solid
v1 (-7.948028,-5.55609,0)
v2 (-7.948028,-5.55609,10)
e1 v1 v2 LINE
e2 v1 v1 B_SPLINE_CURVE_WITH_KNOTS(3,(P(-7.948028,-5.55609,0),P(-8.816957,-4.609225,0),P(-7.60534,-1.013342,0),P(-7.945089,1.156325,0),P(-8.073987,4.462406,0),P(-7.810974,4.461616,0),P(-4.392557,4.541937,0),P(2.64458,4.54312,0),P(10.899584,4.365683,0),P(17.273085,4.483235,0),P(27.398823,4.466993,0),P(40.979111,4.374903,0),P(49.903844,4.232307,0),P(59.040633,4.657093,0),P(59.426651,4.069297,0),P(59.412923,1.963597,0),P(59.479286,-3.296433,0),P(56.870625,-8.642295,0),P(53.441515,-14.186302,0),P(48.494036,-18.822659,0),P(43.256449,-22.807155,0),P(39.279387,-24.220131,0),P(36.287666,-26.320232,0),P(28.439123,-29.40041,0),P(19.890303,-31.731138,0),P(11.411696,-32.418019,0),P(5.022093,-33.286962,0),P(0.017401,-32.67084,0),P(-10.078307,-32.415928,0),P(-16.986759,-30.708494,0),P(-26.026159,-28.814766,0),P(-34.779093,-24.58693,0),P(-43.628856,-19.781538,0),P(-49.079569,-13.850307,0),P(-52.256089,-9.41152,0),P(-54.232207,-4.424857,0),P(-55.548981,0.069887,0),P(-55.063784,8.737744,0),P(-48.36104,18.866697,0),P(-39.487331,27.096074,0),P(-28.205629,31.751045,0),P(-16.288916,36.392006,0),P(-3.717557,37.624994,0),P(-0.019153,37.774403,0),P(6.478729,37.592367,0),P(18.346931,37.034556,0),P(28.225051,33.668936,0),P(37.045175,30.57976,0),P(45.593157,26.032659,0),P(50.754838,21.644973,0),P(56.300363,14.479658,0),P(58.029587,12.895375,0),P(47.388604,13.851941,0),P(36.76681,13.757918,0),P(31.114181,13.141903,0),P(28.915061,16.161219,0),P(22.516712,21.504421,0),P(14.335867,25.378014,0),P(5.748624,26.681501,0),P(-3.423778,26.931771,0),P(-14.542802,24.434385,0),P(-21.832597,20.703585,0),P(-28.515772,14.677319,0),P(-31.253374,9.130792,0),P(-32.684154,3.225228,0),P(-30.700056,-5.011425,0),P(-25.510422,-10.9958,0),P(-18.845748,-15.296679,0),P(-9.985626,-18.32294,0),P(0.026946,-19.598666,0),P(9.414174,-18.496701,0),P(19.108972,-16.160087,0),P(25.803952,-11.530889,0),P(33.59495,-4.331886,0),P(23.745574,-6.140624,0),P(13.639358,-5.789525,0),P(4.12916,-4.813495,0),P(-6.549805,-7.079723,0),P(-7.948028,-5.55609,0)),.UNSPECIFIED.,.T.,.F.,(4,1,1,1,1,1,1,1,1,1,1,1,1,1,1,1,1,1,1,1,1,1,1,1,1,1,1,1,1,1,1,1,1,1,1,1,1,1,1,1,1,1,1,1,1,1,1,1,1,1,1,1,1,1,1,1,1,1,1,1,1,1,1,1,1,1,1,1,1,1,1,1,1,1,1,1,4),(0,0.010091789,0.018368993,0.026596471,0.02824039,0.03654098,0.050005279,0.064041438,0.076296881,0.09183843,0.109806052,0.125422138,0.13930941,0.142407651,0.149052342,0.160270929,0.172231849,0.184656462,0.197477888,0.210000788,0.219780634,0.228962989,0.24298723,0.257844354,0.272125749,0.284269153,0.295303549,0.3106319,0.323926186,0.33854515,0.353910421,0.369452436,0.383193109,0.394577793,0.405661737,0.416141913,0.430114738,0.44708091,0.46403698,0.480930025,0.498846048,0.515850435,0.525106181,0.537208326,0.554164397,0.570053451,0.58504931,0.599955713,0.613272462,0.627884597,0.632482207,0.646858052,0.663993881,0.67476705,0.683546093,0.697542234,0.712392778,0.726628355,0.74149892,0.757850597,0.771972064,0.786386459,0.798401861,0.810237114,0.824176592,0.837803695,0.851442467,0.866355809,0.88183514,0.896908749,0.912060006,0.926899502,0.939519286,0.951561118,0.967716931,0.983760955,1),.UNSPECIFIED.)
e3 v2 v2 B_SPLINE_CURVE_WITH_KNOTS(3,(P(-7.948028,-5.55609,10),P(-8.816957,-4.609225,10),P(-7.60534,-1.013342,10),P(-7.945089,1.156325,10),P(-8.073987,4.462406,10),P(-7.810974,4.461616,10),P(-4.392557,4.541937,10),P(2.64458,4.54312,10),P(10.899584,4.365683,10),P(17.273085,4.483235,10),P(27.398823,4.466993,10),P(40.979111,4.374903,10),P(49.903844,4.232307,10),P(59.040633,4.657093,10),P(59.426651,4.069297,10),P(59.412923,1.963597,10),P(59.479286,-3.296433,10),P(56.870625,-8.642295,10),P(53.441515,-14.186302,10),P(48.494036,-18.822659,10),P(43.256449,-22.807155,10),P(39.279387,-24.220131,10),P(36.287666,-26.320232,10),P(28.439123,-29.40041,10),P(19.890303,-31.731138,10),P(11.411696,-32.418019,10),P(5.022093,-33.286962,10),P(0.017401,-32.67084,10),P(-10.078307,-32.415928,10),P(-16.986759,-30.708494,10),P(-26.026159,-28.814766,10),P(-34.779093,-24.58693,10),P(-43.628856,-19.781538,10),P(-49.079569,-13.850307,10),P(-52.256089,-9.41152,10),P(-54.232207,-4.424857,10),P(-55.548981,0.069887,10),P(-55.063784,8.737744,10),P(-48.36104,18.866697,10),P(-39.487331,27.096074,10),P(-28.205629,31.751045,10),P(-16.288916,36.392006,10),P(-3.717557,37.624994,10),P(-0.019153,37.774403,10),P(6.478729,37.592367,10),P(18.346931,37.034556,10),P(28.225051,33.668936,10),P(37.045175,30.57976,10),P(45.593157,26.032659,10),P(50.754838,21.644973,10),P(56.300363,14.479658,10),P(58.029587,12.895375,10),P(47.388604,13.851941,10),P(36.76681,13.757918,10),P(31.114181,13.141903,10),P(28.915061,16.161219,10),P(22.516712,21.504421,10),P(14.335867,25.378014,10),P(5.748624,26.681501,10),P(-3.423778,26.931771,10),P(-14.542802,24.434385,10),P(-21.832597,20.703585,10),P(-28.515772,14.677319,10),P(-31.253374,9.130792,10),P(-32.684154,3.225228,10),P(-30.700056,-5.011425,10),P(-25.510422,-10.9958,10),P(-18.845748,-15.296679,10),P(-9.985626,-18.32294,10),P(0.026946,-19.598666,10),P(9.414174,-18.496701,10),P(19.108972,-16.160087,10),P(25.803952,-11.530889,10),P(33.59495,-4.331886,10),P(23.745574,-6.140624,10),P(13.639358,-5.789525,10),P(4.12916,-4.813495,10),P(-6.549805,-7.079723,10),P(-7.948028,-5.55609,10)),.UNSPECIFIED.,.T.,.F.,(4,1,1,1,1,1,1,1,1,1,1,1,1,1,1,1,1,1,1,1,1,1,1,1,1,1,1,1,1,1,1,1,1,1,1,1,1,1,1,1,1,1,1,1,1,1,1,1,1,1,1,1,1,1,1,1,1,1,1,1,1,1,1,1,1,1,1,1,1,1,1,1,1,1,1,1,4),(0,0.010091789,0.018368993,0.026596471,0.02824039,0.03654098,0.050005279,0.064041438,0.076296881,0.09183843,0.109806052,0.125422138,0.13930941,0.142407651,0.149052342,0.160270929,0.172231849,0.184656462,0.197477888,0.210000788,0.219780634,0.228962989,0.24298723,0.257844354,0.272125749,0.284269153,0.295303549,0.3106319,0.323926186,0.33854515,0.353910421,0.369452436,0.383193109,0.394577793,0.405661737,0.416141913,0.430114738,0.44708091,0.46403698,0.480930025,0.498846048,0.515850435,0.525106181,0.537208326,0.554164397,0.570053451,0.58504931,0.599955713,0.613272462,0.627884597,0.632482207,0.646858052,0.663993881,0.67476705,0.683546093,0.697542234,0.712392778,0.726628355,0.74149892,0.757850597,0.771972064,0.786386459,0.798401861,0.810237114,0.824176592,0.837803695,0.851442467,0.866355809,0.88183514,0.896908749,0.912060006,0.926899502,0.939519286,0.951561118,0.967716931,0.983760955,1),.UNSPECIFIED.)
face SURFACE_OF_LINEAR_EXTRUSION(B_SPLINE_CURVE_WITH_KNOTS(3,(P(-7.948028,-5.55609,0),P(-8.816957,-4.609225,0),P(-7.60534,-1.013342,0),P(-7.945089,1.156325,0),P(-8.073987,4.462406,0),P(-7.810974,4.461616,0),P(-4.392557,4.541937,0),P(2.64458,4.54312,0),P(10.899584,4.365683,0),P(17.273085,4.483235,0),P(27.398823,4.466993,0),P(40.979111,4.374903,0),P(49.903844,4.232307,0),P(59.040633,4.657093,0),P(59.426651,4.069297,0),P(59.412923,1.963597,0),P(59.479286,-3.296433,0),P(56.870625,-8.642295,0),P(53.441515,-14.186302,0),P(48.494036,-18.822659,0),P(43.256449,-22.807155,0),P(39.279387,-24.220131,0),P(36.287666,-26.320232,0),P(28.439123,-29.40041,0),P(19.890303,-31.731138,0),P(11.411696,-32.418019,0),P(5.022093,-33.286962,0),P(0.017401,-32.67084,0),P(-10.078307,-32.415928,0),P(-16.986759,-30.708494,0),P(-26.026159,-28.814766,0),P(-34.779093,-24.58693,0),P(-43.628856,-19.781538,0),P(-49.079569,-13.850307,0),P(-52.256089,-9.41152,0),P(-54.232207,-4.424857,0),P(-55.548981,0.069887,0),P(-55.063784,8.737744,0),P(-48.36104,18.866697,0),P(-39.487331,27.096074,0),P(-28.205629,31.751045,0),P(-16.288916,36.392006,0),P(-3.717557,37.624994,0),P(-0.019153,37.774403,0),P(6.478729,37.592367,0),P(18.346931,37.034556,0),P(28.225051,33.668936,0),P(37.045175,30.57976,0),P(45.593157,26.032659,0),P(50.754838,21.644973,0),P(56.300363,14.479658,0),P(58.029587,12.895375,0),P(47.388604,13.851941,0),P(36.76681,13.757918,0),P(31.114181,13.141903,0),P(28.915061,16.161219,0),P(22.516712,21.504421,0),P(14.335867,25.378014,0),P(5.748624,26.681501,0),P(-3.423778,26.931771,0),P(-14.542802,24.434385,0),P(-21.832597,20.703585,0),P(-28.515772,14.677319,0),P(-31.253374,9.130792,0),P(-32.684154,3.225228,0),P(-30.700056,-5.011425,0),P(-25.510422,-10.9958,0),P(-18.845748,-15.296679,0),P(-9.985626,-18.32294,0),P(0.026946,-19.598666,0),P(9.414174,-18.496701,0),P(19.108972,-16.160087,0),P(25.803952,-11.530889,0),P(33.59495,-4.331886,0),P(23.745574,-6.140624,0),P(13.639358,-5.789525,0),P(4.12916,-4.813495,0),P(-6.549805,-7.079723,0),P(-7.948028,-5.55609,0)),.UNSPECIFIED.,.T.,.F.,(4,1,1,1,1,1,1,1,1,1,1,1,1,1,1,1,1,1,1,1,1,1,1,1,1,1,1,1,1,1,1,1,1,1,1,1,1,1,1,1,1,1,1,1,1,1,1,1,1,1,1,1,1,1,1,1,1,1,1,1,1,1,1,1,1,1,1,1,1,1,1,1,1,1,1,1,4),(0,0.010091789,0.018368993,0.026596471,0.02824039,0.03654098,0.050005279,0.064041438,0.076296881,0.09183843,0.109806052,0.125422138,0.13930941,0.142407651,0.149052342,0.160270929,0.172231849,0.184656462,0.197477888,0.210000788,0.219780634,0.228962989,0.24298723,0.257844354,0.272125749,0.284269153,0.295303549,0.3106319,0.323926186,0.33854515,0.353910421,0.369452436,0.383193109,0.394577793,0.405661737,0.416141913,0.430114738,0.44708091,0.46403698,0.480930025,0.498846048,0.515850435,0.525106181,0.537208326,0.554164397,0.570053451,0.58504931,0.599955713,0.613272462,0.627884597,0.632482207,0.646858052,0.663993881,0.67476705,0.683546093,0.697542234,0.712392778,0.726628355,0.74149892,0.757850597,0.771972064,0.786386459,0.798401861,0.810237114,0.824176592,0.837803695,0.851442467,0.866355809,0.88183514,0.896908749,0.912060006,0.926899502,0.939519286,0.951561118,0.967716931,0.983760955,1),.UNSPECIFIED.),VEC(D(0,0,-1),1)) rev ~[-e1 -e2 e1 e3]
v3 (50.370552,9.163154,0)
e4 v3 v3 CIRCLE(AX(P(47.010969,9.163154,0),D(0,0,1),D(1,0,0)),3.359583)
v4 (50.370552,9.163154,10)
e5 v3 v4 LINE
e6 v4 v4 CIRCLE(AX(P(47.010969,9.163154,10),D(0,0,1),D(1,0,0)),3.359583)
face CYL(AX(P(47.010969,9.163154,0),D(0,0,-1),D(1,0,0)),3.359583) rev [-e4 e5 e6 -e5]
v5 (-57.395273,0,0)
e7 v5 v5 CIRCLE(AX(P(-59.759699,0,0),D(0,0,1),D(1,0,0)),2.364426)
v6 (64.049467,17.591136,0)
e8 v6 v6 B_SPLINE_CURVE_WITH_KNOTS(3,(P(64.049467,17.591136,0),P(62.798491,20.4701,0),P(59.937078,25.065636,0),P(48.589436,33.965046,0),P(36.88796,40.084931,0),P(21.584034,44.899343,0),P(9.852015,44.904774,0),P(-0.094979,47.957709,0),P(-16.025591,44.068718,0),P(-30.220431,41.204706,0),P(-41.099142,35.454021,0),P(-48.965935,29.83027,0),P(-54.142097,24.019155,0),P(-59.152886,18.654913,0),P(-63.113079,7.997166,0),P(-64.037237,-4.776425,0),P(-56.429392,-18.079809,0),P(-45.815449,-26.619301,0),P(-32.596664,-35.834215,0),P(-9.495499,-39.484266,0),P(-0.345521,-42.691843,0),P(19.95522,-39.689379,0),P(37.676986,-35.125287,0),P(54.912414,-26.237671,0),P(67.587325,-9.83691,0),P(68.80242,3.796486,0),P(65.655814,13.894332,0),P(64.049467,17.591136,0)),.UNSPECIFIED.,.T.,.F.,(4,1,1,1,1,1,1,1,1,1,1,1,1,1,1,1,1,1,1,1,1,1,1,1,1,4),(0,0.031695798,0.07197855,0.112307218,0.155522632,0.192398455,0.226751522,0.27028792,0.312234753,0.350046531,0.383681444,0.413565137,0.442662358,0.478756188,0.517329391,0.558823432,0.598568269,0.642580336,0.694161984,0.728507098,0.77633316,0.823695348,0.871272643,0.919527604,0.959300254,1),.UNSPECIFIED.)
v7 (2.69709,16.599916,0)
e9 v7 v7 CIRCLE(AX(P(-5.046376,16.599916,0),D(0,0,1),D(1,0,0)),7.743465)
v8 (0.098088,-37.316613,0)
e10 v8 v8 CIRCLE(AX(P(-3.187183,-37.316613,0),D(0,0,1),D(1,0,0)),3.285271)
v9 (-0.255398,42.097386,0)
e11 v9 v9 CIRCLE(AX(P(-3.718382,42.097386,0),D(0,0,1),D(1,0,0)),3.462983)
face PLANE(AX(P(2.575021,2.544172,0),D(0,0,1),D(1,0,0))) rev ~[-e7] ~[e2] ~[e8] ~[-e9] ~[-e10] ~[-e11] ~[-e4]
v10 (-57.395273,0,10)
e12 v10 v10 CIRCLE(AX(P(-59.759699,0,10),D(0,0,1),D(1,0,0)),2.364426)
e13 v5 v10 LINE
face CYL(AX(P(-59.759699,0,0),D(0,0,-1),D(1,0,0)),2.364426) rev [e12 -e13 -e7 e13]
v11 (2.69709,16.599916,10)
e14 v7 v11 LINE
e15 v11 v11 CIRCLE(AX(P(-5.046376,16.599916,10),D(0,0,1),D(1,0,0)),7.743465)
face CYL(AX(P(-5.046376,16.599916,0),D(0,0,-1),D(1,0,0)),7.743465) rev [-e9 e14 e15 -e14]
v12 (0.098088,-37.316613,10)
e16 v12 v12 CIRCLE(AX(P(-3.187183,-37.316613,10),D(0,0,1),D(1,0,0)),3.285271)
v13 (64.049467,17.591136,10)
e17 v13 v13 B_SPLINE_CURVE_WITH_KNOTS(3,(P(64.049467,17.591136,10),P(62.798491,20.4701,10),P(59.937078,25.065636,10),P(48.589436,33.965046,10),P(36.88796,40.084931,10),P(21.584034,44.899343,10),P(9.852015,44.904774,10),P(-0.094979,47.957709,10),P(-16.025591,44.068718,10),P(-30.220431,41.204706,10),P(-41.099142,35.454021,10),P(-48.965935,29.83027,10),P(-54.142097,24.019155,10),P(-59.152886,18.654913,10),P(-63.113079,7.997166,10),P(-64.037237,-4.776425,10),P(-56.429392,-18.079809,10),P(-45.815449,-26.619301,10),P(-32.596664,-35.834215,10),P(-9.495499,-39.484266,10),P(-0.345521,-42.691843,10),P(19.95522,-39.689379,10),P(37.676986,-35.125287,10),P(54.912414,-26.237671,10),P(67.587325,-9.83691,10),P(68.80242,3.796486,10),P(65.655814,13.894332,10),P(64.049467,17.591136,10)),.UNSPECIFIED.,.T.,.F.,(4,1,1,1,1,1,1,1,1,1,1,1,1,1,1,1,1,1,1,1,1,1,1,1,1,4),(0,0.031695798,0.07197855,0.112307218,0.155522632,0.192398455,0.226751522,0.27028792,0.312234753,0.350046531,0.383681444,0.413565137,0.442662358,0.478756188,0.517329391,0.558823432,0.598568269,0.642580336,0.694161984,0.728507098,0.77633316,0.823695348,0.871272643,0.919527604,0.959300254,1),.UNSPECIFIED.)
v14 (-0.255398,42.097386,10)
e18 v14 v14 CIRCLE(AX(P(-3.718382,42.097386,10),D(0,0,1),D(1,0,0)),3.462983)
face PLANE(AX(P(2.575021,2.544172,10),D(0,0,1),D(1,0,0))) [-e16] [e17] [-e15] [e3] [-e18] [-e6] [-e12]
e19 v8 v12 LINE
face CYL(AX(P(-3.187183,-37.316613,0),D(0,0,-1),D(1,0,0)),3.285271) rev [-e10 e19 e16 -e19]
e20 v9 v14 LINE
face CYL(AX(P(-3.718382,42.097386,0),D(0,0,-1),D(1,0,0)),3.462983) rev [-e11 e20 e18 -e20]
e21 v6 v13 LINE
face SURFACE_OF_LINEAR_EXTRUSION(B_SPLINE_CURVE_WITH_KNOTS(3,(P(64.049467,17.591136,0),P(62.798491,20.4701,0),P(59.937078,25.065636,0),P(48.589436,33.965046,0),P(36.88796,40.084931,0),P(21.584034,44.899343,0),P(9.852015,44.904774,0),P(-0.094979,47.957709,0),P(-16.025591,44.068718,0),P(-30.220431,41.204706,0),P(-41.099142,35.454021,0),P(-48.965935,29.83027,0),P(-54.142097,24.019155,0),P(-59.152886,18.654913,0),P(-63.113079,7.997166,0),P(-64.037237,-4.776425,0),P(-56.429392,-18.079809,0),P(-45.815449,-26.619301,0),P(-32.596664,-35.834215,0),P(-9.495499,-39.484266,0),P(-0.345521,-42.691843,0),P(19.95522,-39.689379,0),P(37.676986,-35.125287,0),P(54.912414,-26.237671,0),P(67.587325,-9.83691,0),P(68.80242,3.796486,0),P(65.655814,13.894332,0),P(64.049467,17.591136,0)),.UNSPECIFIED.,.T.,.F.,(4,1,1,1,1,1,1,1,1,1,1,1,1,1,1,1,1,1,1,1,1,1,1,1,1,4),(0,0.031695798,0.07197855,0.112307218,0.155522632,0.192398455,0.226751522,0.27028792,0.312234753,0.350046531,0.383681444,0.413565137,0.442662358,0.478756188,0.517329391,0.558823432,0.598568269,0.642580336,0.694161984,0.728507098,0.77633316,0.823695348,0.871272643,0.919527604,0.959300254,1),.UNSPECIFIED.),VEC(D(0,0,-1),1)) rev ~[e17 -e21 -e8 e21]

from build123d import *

# Parameters (mm, degrees)
F0_R     = 3.2852708183
F0_R_2   = 2.364425843
F0_R_3   = 7.7434653542
F0_R_4   = 3.4629833381
F0_R_5   = 3.3595828353
F1_DEPTH = 10


# Not quite as in the source:
# - a feature of the source that left no trace in its solid (it failed there, or was rolled back) is left out


with BuildPart() as f1:
    # F0 (on Top) → F1 (new body)
    with BuildSketch(Plane.XY):
        with BuildLine():
            add(Edge.make_bspline(
                [(64.0494674444, 17.5911355764), (62.7984905164, 20.4701002661), (59.9370782908, 25.0656361584), (48.589435907, 33.9650456559), (36.8879598008, 40.0849314506), (21.5840340204, 44.8993429065), (9.8520147184, 44.9047739559), (-0.0949793233, 47.9577091553), (-16.0255911483, 44.0687178402), (-30.2204308644, 41.2047061879), (-41.0991424388, 35.454020517), (-48.9659345942, 29.8302696852), (-54.1420970094, 24.0191545336), (-59.1528855447, 18.6549133838), (-63.1130787289, 7.9971655396), (-64.037236576, -4.7764253857), (-56.4293924574, -18.0798085839), (-45.8154494455, -26.6193009574), (-32.5966644484, -35.8342146024), (-9.4954986561, -39.4842663585), (-0.3455206577, -42.6918432339), (19.9552197096, -39.6893789454), (37.6769860623, -35.1252873549), (54.9124138985, -26.2376707258), (67.5873246573, -9.8369102569), (68.802420253, 3.7964859956), (65.6558142199, 13.8943322681), (64.0494674444, 17.5911355764)],
                knots=[0, 0, 0, 0, 0.0316957982, 0.0719785495, 0.112307218, 0.1555226318, 0.1923984551, 0.226751522, 0.2702879199, 0.3122347529, 0.3500465305, 0.3836814439, 0.4135651374, 0.4426623577, 0.4787561884, 0.5173293908, 0.5588234324, 0.5985682687, 0.6425803364, 0.694161984, 0.7285070984, 0.7763331596, 0.8236953482, 0.8712726428, 0.9195276041, 0.9593002539, 1, 1, 1, 1], degree=3))
        make_face()
        with Locations((-3.1871828251, -37.3166128993)):
            Circle(F0_R, mode=Mode.SUBTRACT)
        with Locations((-59.7596988082, 0)):
            Circle(F0_R_2, mode=Mode.SUBTRACT)
        with BuildLine():
            add(Edge.make_bspline(
                [(-7.9480279237, -5.5560898036), (-8.8169567089, -4.609224768), (-7.6053400325, -1.0133415387), (-7.9450891617, 1.1563250896), (-8.0739866503, 4.4624059763), (-7.8109743237, 4.4616155054), (-4.3925574508, 4.5419370966), (2.6445795495, 4.5431203801), (10.899584396, 4.3656826057), (17.2730845223, 4.48323533), (27.3988228529, 4.4669931534), (40.9791112485, 4.374903492), (49.9038437274, 4.2323068818), (59.0406328228, 4.6570933183), (59.4266509205, 4.0692972567), (59.4129227784, 1.963596855), (59.4792861123, -3.2964325057), (56.8706250426, -8.6422951546), (53.4415153232, -14.1863022628), (48.4940356249, -18.8226591037), (43.2564493038, -22.8071548224), (39.2793868065, -24.2201312216), (36.2876659284, -26.3202324233), (28.4391225859, -29.4004096684), (19.8903030292, -31.7311381151), (11.4116960673, -32.4180187612), (5.0220925418, -33.2869622899), (0.0174012007, -32.6708397783), (-10.0783065905, -32.4159277895), (-16.9867585758, -30.7084944119), (-26.0261590415, -28.8147658306), (-34.779092642, -24.5869296663), (-43.6288559237, -19.7815380815), (-49.0795691566, -13.8503069064), (-52.2560889397, -9.4115197408), (-54.2322068447, -4.4248570784), (-55.5489808464, 0.0698873522), (-55.0637837545, 8.7377443038), (-48.3610395553, 18.8666968707), (-39.4873310174, 27.0960742803), (-28.2056290546, 31.7510451479), (-16.2889161706, 36.3920060195), (-3.7175567234, 37.624993795), (-0.0191530353, 37.7744026449), (6.4787294615, 37.5923672982), (18.3469311645, 37.0345561054), (28.2250509812, 33.6689363307), (37.0451745339, 30.5797598502), (45.5931568616, 26.0326589173), (50.7548377762, 21.6449725117), (56.3003631351, 14.4796579761), (58.0295868679, 12.8953749238), (47.3886039912, 13.8519411722), (36.7668098679, 13.7579180807), (31.1141806188, 13.1419033459), (28.9150607451, 16.1612189664), (22.5167117484, 21.5044208246), (14.3358665683, 25.3780143883), (5.7486238398, 26.681501261), (-3.423778338, 26.9317714708), (-14.5428023516, 24.434385028), (-21.8325974304, 20.7035848022), (-28.5157722559, 14.6773186626), (-31.2533740192, 9.1307917713), (-32.6841543789, 3.2252277505), (-30.7000557185, -5.0114245762), (-25.5104222848, -10.9958001088), (-18.8457480598, -15.2966790445), (-9.9856263795, -18.3229400344), (0.0269460845, -19.5986661729), (9.4141739855, -18.4967011432), (19.1089722446, -16.16008698), (25.8039519708, -11.5308886807), (33.5949504452, -4.3318863991), (23.7455744872, -6.1406241402), (13.6393579036, -5.7895250881), (4.1291596333, -4.8134947984), (-6.5498046068, -7.0797230325), (-7.9480279237, -5.5560898036)],
                knots=[0, 0, 0, 0, 0.0100917886, 0.0183689929, 0.0265964706, 0.0282403898, 0.0365409801, 0.0500052787, 0.0640414375, 0.076296881, 0.0918384299, 0.1098060524, 0.1254221382, 0.1393094095, 0.1424076506, 0.1490523423, 0.1602709291, 0.1722318493, 0.1846564624, 0.197477888, 0.2100007884, 0.2197806345, 0.2289629891, 0.2429872297, 0.2578443538, 0.272125749, 0.2842691535, 0.2953035486, 0.3106319003, 0.3239261865, 0.33854515, 0.3539104211, 0.3694524359, 0.383193109, 0.3945777931, 0.4056617369, 0.4161419127, 0.4301147385, 0.4470809105, 0.4640369797, 0.4809300247, 0.4988460477, 0.5158504349, 0.5251061814, 0.5372083263, 0.5541643971, 0.5700534505, 0.5850493101, 0.5999557134, 0.6132724624, 0.6278845974, 0.6324822074, 0.6468580525, 0.6639938811, 0.6747670505, 0.6835460933, 0.6975422341, 0.7123927776, 0.7266283546, 0.7414989201, 0.7578505975, 0.7719720635, 0.7863864588, 0.7984018614, 0.8102371136, 0.824176592, 0.837803695, 0.8514424675, 0.8663558093, 0.8818351398, 0.8969087487, 0.9120600058, 0.9268995018, 0.9395192859, 0.9515611184, 0.9677169309, 0.9837609545, 1, 1, 1, 1], degree=3))
        make_face(mode=Mode.SUBTRACT)
        with Locations((-5.0463755615, 16.5999159217)):
            Circle(F0_R_3, mode=Mode.SUBTRACT)
        with Locations((-3.7183815148, 42.0973859727)):
            Circle(F0_R_4, mode=Mode.SUBTRACT)
        with Locations((47.0109693706, 9.1631542891)):
            Circle(F0_R_5, mode=Mode.SUBTRACT)
    extrude(amount=F1_DEPTH)


solid = f1.part
